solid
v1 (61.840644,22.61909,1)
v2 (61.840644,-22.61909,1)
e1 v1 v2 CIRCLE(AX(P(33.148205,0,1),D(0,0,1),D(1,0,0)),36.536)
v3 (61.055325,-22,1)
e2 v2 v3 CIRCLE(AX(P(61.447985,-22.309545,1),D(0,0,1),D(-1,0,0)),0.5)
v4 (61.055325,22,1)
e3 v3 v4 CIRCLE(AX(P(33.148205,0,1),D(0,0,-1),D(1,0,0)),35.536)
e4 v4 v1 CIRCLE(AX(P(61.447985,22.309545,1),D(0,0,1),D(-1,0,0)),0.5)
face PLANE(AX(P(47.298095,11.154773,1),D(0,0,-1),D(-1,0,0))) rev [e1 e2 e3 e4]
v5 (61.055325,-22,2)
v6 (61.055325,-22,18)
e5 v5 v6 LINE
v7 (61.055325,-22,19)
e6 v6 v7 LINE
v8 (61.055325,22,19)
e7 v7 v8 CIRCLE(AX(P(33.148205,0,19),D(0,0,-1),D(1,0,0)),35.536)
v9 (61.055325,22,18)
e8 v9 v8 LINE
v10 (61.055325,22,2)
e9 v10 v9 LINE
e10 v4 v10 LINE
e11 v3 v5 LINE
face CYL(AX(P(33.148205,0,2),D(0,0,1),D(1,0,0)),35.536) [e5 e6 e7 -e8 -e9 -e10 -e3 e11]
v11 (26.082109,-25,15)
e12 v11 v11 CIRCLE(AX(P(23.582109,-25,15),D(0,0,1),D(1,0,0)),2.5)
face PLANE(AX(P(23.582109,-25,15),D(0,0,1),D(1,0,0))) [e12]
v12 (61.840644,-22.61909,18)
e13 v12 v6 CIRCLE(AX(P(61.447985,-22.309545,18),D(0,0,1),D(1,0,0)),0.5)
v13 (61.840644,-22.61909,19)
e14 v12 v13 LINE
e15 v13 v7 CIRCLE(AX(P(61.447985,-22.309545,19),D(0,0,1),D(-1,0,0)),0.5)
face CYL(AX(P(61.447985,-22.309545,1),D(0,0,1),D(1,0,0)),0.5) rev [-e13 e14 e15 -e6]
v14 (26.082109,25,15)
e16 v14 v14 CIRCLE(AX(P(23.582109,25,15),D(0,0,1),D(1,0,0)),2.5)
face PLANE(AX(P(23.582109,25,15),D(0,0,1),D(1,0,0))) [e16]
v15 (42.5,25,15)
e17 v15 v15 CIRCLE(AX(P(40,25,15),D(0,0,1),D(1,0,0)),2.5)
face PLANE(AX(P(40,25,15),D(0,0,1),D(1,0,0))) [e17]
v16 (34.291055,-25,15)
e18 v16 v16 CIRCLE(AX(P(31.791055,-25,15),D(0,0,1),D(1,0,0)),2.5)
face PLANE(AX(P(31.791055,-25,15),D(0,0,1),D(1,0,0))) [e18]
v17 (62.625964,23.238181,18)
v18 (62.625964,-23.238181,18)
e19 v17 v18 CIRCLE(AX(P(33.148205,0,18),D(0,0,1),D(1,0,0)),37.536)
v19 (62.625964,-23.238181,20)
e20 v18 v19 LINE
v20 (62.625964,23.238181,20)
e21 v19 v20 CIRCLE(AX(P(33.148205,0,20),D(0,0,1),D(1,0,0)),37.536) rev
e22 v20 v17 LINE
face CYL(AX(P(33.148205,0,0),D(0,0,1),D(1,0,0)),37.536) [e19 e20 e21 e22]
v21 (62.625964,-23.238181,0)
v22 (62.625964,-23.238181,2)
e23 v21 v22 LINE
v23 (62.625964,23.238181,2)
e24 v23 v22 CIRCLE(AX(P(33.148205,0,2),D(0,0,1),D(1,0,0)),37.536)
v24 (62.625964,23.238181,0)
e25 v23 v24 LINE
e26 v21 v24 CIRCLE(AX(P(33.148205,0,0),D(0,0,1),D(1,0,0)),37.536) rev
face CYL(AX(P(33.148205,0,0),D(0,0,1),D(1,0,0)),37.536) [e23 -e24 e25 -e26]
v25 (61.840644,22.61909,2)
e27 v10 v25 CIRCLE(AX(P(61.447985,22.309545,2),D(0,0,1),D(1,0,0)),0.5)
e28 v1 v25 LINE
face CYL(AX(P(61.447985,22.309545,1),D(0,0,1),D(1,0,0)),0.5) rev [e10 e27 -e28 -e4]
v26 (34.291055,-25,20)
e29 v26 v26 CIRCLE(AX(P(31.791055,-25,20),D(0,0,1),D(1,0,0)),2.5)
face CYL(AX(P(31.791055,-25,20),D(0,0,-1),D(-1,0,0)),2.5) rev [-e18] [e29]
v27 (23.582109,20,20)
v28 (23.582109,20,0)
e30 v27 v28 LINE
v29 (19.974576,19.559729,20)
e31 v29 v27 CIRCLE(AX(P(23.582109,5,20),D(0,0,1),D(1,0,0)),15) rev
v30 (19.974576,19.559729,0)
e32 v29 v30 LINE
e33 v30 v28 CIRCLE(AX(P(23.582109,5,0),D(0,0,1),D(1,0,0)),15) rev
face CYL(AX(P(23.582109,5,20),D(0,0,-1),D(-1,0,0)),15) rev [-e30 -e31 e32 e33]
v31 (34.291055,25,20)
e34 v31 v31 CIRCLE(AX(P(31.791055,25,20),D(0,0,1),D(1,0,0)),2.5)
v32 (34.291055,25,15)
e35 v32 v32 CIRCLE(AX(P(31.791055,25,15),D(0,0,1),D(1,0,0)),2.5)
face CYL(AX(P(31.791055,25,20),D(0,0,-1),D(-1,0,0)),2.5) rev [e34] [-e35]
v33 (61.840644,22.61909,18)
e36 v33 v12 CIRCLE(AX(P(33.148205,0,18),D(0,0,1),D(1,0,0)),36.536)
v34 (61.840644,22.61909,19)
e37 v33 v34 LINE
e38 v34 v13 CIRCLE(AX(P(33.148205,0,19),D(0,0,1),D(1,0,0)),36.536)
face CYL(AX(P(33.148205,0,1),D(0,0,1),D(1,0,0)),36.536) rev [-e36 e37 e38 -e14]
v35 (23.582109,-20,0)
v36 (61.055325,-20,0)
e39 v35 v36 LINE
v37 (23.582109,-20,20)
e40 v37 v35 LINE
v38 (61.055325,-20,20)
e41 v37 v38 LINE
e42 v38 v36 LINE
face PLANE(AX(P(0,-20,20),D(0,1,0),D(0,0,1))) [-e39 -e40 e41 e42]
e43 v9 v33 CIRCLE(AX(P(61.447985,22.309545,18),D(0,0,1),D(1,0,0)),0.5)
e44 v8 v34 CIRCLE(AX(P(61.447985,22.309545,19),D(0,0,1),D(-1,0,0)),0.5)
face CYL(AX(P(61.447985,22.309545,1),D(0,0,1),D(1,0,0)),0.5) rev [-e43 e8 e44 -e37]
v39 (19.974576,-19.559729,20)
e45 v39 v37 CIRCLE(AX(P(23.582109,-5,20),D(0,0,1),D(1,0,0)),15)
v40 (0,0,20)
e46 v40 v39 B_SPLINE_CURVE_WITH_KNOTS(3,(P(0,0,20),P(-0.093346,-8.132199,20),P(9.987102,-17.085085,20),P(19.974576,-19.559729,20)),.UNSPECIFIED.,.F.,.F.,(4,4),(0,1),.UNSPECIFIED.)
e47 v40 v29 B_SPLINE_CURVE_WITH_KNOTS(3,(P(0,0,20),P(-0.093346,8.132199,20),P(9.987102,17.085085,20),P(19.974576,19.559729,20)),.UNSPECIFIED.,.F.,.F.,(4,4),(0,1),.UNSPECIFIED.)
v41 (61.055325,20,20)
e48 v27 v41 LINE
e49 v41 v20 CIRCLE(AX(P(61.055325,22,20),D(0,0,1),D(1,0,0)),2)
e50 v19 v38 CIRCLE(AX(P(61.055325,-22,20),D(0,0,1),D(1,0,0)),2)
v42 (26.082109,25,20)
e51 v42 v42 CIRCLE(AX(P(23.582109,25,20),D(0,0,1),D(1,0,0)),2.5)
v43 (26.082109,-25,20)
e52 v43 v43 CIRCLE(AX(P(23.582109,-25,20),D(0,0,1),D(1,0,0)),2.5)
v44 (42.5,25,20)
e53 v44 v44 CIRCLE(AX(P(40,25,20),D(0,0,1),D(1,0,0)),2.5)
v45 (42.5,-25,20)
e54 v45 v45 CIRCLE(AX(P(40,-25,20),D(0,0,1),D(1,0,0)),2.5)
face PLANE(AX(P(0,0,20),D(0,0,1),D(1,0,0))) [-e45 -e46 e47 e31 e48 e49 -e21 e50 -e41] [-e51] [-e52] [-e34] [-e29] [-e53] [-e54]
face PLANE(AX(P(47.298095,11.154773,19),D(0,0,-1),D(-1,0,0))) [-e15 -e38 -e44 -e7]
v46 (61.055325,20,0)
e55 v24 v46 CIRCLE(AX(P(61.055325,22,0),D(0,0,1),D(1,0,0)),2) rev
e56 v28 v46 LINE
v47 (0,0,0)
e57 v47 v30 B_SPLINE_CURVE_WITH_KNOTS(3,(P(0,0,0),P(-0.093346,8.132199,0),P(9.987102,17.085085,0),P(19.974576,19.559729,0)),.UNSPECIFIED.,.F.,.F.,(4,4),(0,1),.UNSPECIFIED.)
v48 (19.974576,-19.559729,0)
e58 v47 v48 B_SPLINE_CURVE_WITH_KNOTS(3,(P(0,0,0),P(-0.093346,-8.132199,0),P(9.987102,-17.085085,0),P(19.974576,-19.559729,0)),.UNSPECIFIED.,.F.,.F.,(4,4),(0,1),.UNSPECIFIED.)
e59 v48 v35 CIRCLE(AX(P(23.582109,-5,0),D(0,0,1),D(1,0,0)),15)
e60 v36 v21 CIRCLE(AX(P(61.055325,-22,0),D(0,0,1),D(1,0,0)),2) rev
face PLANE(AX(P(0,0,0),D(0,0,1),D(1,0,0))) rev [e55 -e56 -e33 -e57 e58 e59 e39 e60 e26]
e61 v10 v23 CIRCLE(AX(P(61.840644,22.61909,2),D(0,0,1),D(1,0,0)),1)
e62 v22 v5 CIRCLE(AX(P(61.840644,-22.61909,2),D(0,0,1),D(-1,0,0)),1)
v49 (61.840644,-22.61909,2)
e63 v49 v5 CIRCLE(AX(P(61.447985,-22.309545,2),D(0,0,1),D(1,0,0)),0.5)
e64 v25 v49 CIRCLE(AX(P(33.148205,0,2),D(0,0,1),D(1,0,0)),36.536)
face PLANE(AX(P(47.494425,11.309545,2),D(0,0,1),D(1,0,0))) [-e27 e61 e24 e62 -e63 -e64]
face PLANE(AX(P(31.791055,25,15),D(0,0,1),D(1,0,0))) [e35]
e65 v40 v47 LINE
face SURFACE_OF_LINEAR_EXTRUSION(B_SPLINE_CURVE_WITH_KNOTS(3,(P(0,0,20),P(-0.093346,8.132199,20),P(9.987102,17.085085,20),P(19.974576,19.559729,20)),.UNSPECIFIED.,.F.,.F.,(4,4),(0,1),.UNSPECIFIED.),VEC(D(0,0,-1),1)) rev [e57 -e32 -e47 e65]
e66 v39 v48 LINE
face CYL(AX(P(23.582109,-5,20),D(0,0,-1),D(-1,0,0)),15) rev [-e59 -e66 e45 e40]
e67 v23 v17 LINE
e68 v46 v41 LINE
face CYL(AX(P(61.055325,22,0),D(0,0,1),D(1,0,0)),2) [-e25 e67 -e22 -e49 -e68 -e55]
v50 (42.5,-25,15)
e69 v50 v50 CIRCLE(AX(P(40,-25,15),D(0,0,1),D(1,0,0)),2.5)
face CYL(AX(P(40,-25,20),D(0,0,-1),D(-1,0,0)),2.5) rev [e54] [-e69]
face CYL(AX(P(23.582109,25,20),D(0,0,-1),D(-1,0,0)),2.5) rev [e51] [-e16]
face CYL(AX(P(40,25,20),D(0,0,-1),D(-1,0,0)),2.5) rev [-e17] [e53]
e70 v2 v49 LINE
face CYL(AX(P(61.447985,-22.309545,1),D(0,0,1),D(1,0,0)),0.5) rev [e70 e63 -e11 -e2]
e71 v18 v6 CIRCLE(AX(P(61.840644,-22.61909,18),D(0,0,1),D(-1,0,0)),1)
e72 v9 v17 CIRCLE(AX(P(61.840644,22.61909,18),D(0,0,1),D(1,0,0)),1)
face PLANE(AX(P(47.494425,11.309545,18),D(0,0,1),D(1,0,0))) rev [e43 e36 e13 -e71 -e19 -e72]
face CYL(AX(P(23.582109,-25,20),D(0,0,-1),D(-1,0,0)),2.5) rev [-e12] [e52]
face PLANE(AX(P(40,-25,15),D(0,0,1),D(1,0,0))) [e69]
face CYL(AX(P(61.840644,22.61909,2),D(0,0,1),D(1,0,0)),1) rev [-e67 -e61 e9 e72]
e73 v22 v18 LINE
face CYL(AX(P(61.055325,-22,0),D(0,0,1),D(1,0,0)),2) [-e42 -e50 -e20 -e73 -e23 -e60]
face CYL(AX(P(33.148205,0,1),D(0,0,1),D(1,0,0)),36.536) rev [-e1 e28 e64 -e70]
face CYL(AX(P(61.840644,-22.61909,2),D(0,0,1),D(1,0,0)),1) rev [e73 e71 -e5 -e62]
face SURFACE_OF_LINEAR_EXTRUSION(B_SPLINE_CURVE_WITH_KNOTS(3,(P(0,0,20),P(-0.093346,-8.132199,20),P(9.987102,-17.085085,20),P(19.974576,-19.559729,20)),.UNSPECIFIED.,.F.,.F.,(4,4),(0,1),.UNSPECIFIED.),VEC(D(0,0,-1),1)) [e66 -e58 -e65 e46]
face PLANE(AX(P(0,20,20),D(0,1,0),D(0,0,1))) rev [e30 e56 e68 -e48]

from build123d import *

# Parameters (mm, degrees)
BOSS_EXTRUDE1_OUTLINE_R = 2.5
BOSS_EXTRUDE1_DEPTH     = 20
SKETCH3_R               = 2.5
BOSS_EXTRUDE2_DEPTH     = 15
BOSS_EXTRUDE5_START     = -20
BOSS_EXTRUDE5_DEPTH     = 20
FILLET1_R               = 2
CUT_EXTRUDE1_DEPTH      = 8
CUT_EXTRUDE2_DEPTH      = 9


# Read off the part's stored shape, not the designer's step: Boss-Extrude1
with BuildPart() as part:
    # Boss-Extrude1 outline → Boss-Extrude1 (new body)
    with BuildSketch(Plane.XY):
        with BuildLine():
            add(Edge.make_bspline(
                [(0, 0), (-0.093345976, -8.132199046), (9.987102308, -17.085085201), (19.974576426, -19.559728919)],
                knots=[0, 0, 0, 0, 1, 1, 1, 1], degree=3))
            add(Edge.make_bspline(
                [(0, 0), (-0.093345976, 8.132199046), (9.987102308, 17.085085201), (19.974576426, 19.559728919)],
                knots=[0, 0, 0, 0, 1, 1, 1, 1], degree=3))
            ThreePointArc((19.974576426, 19.559728919), (21.76495963, 19.889525409), (23.58210935, 20))
            Line((23.58210935, 20), (40, 20))
            ThreePointArc((40, 20), (45, 25), (40, 30))
            Line((40, 30), (23.58210935, 30))
            ThreePointArc((23.58210935, 30), (20.553526483, 29.815875681), (17.569554476, 29.266214865))
            ThreePointArc((17.569554476, 29.266214865), (-4.387795245, 0), (17.569554476, -29.266214865))
            ThreePointArc((17.569554476, -29.266214865), (20.553526483, -29.815875681), (23.58210935, -30))
            Line((23.58210935, -30), (40, -30))
            ThreePointArc((40, -30), (45, -25), (40, -20))
            Line((40, -20), (23.58210935, -20))
            ThreePointArc((23.58210935, -20), (21.76495963, -19.889525409), (19.974576426, -19.559728919))
        make_face()
        with Locations((23.58210935, -25)):
            Circle(BOSS_EXTRUDE1_OUTLINE_R, mode=Mode.SUBTRACT)
        with Locations((31.791054675, -25)):
            Circle(BOSS_EXTRUDE1_OUTLINE_R, mode=Mode.SUBTRACT)
        with Locations((40, -25)):
            Circle(BOSS_EXTRUDE1_OUTLINE_R, mode=Mode.SUBTRACT)
        with Locations((23.58210935, 25)):
            Circle(BOSS_EXTRUDE1_OUTLINE_R, mode=Mode.SUBTRACT)
        with Locations((31.791054675, 25)):
            Circle(BOSS_EXTRUDE1_OUTLINE_R, mode=Mode.SUBTRACT)
        with Locations((40, 25)):
            Circle(BOSS_EXTRUDE1_OUTLINE_R, mode=Mode.SUBTRACT)
    extrude(amount=BOSS_EXTRUDE1_DEPTH)

    # Sketch3 → Boss-Extrude2 (add)
    with BuildSketch(Plane.XY):
        with Locations((23.58210935, 25)):
            Circle(SKETCH3_R)
        with Locations((31.791054675, 25)):
            Circle(SKETCH3_R)
        with Locations((40, 25)):
            Circle(SKETCH3_R)
        with Locations((23.58210935, -25)):
            Circle(SKETCH3_R)
        with Locations((31.791054675, -25)):
            Circle(SKETCH3_R)
        with Locations((40, -25)):
            Circle(SKETCH3_R)
    extrude(amount=BOSS_EXTRUDE2_DEPTH)

    # Sketch6 → Boss-Extrude5 (add)
    with BuildSketch(Plane.XY.offset(20).offset(BOSS_EXTRUDE5_START)):
        with BuildLine():
            Line((40, 20), (64.912199257, 20))
            ThreePointArc((64.912199257, 20), (22.740082707, 36.064141627), (-4.387795245, 1.8e-07))
            ThreePointArc((-4.387795245, 1.8e-07), (1.711810468, 18.293691193), (17.569554476, 29.266214865))
            ThreePointArc((17.569554476, 29.266214865), (20.553526483, 29.815875681), (23.58210935, 30))
            Line((23.58210935, 30), (40, 30))
            ThreePointArc((40, 30), (45, 25), (40, 20))
        make_face()
        with BuildLine():
            ThreePointArc((17.569554476, -29.266214865), (1.71181036, -18.293691049), (-4.387795245, 1.8e-07))
            ThreePointArc((-4.387795245, 1.8e-07), (22.740082534, -36.064141577), (64.912199257, -20))
            Line((64.912199257, -20), (40, -20))
            ThreePointArc((40, -20), (45, -25), (40, -30))
            Line((40, -30), (23.58210935, -30))
            ThreePointArc((23.58210935, -30), (20.553526483, -29.815875681), (17.569554476, -29.266214865))
        make_face()
    extrude(amount=BOSS_EXTRUDE5_DEPTH)

    # Fillet1
    fillet1_edges = [part.edges().sort_by_distance(p)[0] for p in [
        (64.912199257, -20, 10),
        (64.912199257, 20, 10),
    ]]
    fillet(fillet1_edges, radius=FILLET1_R)

    # Sketch7 → Cut-Extrude1 (cut, symmetric)
    with BuildSketch(Plane.XY.offset(10)):
        with BuildLine():
            ThreePointArc((61.055324679, 22), (-2.387795245, 0), (61.055324679, -22))
            ThreePointArc((61.055324679, -22), (62.459734828, -21.833770838), (62.62596399, -23.238180987))
            ThreePointArc((62.62596399, -23.238180987), (-4.387795245, 0), (62.62596399, 23.238180987))
            ThreePointArc((62.62596399, 23.238180987), (62.459734828, 21.833770838), (61.055324679, 22))
        make_face()
    extrude(amount=CUT_EXTRUDE1_DEPTH, both=True, mode=Mode.SUBTRACT)

    # Sketch8 → Cut-Extrude2 (cut, symmetric)
    with BuildSketch(Plane.XY.offset(10)):
        with BuildLine():
            ThreePointArc((61.055324679, 22), (-2.387795245, 0), (61.055324679, -22))
            ThreePointArc((61.055324679, -22), (61.757529753, -21.916885419), (61.840644334, -22.619090493))
            ThreePointArc((61.840644334, -22.619090493), (-3.387795245, 0), (61.840644334, 22.619090493))
            ThreePointArc((61.840644334, 22.619090493), (61.757529753, 21.916885419), (61.055324679, 22))
        make_face()
    extrude(amount=CUT_EXTRUDE2_DEPTH, both=True, mode=Mode.SUBTRACT)


solid = part.part
